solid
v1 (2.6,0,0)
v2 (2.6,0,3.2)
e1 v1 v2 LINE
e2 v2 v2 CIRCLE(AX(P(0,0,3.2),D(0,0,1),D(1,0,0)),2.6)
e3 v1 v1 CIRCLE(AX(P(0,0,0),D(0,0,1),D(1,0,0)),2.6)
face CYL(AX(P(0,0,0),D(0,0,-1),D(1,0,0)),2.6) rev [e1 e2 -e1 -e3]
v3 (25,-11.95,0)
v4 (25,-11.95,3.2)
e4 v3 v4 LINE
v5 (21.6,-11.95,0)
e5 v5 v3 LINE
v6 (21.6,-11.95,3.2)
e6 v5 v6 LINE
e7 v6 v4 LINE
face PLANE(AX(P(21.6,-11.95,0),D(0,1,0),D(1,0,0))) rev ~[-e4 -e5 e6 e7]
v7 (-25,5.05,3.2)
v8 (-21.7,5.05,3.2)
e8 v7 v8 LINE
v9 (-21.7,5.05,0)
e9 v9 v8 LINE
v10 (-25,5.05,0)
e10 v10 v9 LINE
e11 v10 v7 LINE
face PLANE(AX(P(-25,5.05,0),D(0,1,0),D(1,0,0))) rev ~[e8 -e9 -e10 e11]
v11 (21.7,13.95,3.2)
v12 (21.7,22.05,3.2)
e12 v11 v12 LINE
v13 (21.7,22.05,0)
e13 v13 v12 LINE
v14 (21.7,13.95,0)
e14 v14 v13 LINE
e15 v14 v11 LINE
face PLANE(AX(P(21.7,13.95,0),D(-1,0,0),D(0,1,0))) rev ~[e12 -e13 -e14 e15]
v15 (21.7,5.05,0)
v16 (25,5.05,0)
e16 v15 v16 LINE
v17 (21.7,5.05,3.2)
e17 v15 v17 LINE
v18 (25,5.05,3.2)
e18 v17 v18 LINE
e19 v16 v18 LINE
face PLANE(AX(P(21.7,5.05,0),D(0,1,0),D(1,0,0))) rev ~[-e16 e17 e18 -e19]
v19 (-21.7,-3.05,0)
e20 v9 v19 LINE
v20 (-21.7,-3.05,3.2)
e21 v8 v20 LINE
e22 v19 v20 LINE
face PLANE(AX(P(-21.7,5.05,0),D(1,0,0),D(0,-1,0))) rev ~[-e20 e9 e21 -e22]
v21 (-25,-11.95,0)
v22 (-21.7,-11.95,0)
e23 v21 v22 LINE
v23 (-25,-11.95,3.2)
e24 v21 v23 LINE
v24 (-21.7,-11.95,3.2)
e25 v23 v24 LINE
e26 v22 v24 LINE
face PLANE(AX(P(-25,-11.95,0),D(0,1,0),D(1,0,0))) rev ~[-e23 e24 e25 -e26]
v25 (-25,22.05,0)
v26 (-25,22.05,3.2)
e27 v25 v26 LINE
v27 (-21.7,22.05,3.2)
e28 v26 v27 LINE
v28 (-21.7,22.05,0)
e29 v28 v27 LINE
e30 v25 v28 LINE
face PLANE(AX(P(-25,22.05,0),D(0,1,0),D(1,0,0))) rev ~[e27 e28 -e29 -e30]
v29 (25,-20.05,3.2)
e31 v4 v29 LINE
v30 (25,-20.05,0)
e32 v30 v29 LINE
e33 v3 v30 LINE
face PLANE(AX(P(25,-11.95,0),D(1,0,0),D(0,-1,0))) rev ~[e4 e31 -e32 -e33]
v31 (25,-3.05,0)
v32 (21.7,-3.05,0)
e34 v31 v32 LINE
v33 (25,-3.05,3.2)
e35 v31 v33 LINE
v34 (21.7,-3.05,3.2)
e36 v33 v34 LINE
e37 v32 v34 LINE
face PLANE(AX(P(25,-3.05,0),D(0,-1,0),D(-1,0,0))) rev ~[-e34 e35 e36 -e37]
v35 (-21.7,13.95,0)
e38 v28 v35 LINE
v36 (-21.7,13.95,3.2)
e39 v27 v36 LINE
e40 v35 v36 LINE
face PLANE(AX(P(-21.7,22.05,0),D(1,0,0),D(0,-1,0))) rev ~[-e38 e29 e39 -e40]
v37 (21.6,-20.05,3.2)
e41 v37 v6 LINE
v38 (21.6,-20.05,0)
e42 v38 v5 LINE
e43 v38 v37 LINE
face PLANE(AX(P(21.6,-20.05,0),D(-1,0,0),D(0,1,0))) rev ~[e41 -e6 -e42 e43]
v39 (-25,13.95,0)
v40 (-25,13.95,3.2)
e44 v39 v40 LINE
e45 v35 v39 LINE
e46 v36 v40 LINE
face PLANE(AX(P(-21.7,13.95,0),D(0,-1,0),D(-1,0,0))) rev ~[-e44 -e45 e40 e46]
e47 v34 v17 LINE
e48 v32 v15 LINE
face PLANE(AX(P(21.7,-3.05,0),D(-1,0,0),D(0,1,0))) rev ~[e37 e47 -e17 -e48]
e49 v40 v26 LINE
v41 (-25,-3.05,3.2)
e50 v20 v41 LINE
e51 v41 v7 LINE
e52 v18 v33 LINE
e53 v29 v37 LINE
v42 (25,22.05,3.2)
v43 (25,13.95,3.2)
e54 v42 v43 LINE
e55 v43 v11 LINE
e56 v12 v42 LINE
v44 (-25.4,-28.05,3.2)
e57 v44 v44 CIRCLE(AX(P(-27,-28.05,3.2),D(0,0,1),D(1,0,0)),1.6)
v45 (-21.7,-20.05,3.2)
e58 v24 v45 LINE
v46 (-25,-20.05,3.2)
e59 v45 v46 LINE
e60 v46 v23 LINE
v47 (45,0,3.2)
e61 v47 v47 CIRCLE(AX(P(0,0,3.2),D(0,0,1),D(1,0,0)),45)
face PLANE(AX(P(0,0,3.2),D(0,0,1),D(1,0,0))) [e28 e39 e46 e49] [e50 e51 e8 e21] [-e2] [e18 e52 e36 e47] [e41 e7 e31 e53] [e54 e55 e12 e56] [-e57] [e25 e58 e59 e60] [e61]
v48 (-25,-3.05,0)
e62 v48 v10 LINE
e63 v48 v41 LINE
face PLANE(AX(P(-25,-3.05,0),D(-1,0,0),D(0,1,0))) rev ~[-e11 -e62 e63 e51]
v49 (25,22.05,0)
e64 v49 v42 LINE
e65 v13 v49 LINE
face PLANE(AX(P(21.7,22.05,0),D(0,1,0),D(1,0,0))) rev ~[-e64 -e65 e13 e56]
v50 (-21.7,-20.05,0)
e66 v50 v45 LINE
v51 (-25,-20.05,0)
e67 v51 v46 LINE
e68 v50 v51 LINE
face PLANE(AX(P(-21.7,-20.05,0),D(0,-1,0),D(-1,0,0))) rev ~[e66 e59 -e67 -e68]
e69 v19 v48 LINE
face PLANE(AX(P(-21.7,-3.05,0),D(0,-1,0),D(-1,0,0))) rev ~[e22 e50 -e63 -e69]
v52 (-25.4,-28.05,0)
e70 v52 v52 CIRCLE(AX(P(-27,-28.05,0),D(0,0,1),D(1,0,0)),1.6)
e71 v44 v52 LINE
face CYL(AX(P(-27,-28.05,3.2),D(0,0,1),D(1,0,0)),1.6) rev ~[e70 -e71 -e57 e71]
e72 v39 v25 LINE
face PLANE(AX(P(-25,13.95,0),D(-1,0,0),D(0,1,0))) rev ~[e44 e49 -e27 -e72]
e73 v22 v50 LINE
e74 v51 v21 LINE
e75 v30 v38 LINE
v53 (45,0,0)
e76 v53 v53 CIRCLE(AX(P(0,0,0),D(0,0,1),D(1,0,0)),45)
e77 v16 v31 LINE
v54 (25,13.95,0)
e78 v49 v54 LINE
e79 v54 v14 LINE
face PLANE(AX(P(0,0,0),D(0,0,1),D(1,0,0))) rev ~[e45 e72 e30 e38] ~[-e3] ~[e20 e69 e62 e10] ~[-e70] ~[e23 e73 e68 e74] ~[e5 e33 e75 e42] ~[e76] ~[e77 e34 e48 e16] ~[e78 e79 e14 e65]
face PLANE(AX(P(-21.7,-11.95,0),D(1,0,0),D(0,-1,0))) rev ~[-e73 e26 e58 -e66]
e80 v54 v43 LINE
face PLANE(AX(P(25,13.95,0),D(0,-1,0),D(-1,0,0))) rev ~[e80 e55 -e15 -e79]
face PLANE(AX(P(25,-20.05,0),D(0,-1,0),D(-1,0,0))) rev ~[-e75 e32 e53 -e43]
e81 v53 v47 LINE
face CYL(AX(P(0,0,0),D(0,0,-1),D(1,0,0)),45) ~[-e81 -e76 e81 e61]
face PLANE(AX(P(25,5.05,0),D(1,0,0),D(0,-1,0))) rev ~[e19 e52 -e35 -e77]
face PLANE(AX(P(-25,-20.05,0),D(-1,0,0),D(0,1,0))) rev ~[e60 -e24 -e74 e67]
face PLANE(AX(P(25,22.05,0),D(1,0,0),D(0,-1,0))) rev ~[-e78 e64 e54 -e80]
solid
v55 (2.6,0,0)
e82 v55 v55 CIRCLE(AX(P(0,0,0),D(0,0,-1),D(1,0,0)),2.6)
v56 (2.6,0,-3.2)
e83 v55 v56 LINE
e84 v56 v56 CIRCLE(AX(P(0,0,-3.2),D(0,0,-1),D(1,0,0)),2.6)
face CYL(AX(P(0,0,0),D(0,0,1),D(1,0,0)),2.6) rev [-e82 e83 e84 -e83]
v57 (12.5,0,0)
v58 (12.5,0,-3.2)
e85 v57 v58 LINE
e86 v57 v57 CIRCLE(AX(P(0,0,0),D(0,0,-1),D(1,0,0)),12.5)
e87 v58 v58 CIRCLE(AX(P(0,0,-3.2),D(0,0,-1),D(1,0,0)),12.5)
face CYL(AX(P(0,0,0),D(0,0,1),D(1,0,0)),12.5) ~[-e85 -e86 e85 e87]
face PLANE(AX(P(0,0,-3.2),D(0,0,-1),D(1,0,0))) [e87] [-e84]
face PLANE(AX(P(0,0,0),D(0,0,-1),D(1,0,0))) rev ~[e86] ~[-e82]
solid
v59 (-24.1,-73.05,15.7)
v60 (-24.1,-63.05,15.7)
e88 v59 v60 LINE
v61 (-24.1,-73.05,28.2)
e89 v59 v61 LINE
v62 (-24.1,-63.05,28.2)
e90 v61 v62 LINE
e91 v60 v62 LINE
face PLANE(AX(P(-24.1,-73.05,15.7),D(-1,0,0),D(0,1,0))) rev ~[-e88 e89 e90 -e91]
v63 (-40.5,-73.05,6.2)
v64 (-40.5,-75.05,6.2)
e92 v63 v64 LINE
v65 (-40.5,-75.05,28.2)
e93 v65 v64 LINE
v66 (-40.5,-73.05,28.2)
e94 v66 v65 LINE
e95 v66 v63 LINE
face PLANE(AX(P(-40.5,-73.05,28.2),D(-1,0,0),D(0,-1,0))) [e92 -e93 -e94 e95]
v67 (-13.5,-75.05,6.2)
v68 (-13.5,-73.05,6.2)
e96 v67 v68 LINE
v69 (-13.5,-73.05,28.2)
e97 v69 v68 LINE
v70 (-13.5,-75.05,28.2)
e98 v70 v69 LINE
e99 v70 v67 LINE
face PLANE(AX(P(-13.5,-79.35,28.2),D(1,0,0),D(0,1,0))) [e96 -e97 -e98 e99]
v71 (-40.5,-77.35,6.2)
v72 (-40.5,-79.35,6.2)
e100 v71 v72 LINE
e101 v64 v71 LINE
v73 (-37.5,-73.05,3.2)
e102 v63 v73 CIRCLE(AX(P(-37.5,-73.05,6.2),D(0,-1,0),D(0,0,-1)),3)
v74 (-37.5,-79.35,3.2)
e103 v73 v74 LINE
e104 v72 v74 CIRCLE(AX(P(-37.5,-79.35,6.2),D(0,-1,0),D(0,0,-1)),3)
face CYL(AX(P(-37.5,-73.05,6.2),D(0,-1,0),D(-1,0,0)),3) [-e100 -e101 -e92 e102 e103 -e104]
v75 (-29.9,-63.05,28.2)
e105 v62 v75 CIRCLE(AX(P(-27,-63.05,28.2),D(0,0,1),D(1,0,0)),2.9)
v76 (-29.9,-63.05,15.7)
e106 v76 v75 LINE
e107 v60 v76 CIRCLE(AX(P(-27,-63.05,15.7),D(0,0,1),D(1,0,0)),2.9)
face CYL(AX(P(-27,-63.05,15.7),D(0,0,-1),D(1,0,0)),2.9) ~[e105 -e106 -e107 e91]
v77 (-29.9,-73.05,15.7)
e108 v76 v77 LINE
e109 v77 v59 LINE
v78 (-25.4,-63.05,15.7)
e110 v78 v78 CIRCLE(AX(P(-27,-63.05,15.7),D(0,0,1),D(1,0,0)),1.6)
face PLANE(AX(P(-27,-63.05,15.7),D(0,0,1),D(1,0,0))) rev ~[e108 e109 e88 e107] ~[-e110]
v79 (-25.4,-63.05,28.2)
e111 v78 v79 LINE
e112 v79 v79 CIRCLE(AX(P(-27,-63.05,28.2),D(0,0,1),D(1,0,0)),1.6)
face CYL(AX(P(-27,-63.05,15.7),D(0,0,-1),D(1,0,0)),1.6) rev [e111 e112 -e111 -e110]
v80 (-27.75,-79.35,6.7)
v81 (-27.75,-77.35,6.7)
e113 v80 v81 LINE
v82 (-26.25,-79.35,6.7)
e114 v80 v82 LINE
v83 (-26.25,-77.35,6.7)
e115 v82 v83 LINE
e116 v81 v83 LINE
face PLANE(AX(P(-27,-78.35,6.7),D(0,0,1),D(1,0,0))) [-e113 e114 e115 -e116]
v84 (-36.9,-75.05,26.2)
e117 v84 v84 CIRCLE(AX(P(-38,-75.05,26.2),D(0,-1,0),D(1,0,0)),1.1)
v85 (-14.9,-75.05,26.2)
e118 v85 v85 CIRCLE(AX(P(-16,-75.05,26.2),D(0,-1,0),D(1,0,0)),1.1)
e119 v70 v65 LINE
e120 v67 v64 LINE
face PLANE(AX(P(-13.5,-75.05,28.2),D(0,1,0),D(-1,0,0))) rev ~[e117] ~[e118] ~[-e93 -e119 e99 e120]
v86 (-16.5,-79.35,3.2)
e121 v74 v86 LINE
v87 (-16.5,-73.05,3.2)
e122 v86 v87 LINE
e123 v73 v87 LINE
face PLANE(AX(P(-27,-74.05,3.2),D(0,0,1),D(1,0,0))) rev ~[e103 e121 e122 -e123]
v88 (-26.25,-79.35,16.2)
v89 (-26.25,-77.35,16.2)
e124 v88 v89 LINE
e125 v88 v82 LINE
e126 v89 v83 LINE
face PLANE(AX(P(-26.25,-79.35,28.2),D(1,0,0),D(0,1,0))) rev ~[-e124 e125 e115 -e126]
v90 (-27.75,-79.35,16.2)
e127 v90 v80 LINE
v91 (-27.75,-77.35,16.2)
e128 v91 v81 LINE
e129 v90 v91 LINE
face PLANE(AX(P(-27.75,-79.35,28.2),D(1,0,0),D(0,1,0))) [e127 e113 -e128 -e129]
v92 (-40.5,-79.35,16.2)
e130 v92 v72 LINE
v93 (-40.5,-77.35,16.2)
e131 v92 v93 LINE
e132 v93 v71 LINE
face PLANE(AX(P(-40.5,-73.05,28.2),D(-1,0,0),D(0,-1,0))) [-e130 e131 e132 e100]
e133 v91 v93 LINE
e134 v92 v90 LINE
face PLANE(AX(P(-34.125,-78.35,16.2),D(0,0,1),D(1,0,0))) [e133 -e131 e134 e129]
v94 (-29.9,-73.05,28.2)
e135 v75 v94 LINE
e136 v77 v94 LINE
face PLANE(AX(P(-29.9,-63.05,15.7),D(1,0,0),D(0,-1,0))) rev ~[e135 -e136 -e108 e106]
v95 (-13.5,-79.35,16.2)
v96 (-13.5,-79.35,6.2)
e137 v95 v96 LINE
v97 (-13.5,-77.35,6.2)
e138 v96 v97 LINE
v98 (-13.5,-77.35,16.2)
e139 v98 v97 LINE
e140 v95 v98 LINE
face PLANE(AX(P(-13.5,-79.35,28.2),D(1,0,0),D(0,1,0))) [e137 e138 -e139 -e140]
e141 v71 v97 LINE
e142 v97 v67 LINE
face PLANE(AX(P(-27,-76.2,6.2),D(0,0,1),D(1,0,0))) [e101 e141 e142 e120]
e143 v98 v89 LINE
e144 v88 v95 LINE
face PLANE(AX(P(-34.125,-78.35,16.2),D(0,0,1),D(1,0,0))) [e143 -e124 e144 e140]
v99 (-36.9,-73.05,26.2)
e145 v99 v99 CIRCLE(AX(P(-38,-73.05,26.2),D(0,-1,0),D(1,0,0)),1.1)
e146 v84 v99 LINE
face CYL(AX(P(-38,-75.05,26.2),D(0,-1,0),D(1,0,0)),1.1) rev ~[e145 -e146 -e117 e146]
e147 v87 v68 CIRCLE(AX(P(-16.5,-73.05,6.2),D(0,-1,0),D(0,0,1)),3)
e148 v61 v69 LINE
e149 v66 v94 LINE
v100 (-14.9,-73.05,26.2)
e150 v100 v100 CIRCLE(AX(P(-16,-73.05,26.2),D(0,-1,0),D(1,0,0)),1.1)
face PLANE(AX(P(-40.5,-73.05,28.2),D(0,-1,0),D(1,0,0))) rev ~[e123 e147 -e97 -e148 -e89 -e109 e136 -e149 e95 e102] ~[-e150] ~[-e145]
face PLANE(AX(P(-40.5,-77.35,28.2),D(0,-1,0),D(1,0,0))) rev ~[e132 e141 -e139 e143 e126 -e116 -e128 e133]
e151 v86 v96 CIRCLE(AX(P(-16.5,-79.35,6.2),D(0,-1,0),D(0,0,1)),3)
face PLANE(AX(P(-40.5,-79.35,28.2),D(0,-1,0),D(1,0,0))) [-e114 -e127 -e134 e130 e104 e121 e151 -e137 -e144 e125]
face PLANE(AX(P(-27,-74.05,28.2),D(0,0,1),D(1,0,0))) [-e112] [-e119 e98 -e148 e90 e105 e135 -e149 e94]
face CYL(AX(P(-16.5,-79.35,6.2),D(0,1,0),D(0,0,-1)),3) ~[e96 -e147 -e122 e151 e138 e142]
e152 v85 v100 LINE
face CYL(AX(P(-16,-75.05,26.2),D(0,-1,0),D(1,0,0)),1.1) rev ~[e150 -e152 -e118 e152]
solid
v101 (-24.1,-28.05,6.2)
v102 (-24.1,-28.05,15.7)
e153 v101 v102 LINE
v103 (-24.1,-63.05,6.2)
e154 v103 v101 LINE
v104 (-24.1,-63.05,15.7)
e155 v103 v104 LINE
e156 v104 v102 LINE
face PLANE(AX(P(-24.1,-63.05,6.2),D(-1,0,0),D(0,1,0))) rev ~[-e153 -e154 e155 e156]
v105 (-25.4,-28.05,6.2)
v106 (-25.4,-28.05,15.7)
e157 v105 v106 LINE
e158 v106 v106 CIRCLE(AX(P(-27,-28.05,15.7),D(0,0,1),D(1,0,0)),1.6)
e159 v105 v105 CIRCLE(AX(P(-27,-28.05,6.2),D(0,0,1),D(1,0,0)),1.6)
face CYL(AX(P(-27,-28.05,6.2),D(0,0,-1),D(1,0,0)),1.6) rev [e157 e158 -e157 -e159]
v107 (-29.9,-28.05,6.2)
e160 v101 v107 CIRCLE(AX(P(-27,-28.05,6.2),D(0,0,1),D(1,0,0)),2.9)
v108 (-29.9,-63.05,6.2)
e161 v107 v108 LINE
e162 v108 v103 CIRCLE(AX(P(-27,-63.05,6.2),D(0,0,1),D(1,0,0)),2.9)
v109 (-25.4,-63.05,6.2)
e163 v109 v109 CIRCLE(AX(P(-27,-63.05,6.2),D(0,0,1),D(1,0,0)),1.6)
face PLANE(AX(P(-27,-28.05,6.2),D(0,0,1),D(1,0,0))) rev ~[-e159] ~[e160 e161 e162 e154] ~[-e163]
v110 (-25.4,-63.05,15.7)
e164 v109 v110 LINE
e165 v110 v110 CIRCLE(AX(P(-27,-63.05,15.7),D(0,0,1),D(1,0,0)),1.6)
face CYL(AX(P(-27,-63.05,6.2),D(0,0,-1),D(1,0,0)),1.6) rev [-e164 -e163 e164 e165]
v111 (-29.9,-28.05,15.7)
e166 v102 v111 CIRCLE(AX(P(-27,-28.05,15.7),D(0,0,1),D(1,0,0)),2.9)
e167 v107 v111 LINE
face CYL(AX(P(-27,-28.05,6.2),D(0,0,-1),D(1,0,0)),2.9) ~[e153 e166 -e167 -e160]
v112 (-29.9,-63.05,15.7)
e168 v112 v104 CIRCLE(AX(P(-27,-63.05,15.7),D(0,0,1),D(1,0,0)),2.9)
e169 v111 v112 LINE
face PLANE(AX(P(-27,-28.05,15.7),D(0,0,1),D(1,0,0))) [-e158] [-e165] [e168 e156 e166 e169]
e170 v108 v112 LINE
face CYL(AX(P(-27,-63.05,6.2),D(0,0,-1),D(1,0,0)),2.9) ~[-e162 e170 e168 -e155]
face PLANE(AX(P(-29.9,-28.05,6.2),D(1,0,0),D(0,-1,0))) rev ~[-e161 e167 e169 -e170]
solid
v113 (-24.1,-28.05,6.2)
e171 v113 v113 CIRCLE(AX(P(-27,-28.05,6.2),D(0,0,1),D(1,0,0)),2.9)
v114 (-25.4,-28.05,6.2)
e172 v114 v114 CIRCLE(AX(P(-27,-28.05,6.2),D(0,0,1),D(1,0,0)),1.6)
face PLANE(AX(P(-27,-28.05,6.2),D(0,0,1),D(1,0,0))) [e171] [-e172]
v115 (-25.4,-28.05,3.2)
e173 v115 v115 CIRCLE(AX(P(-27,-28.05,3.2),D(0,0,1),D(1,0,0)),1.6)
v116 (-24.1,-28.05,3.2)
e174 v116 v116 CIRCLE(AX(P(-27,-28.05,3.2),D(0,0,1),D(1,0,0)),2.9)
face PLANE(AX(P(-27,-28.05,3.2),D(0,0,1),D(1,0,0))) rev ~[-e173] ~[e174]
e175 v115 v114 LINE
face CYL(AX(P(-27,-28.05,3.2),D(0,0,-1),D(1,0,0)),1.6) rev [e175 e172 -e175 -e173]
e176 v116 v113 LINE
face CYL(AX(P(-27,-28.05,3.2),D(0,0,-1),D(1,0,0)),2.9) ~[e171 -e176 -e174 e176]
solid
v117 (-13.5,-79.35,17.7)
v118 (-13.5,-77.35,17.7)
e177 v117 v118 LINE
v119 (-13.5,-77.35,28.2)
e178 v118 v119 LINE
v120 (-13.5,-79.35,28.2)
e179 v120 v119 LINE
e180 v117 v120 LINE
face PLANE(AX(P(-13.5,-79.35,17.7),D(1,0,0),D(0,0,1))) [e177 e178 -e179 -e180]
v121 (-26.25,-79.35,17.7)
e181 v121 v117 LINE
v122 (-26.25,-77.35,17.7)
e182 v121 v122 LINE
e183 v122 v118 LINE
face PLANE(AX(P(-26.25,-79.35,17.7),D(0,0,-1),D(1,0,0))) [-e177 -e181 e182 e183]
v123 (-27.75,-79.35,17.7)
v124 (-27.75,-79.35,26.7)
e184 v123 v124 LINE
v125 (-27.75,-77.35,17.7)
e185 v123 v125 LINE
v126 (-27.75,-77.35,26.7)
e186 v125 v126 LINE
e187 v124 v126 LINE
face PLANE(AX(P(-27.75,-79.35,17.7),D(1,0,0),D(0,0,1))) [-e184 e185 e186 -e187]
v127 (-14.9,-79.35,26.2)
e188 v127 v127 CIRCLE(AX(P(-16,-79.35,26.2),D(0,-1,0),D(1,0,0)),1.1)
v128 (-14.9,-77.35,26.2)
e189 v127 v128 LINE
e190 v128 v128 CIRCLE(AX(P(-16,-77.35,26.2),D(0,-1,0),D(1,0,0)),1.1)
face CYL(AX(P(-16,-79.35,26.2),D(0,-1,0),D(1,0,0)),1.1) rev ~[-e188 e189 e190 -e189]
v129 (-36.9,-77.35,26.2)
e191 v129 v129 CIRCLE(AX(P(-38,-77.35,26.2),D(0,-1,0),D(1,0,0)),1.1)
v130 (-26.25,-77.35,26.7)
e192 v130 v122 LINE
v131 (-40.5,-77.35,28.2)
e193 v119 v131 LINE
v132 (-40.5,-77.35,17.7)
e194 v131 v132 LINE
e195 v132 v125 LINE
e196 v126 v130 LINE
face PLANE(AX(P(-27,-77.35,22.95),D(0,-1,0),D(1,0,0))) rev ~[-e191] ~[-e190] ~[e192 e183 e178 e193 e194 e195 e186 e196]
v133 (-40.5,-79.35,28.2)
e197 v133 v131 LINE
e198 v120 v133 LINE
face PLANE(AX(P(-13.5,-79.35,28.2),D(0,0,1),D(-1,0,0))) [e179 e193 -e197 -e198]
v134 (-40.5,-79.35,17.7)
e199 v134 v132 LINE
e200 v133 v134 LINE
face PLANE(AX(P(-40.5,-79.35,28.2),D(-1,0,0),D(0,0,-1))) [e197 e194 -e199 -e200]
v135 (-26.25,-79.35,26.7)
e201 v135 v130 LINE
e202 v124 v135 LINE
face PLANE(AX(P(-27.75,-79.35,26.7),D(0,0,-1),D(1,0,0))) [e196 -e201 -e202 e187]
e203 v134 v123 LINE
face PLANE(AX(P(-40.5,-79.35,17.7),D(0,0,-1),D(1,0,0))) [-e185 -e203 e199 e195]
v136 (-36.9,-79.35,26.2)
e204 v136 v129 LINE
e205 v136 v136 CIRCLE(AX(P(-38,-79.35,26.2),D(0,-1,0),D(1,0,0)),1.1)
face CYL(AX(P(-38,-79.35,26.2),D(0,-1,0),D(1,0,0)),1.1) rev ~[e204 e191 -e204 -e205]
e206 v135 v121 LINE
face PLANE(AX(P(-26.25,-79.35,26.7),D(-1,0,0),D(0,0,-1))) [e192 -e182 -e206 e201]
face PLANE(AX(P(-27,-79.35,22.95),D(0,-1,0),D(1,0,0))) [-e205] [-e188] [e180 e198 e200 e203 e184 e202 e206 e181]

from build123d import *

# Parameters (mm, degrees)
F0_R      = 2.6
F1_DEPTH  = 3.2
F2_R      = 45
F2_R_2    = 35.3553390593
F3_DEPTH  = 3.2
F4_R      = 1.6
F5_DEPTH  = 3.2
F4_R_2    = 2.9
F6_DEPTH  = 2.5
F7_DEPTH  = 12
F9_DEPTH  = 3
F10_R     = 1.6
F11_DEPTH = 9.5
F12_R     = 12.5
F12_R_2   = 2.6
F13_DEPTH = 3.2
F14_R     = 1.6
F15_DEPTH = 12.5
F16_W     = 27
F16_H     = 2
F16_W_2   = 12.75
F16_W_3   = 1.5
F17_DEPTH = 25
F18_R     = 3
F19_DEPTH = 22
F20_DEPTH = 12
F21_DEPTH = 21.5
F22_R     = 1.1
F23_DEPTH = 2
F24_R     = 1.1
F25_DEPTH = 2


# Not quite as in the source:
# - a feature names something its author has since deleted; it is built from what else it names


with BuildPart() as f1:
    # F0 (on Top) → F1 (new body)
    with BuildSketch(Plane.XY):
        with BuildLine():
            ThreePointArc((25, -25), (32.6640741219, -13.5299025037), (35.3553390593, 0))
            ThreePointArc((35.3553390593, 0), (32.6640741219, 13.5299025037), (25, 25))
            Line((25, 25), (25, 22.05))
            Line((25, 22.05), (25, 13.95))
            Line((25, 13.95), (25, 5.05))
            Line((25, 5.05), (25, -3.05))
            Line((25, -3.05), (25, -11.95))
            Line((25, -11.95), (25, -20.05))
            Line((25, -20.05), (25, -25))
        make_face()
        with BuildLine():
            Line((-25, 25), (25, 25))
            ThreePointArc((25, 25), (0, 35.3553390593), (-25, 25))
        make_face()
        Polygon((25, 22.05), (25, 25), (-25, 25), (-25, 22.05), (-21.7, 22.05), (-21.7, 13.95), (-25, 13.95), (-25, 5.05), (-21.7, 5.05), (-21.7, -3.05), (-25, -3.05), (-25, -11.95), (-21.7, -11.95), (-21.7, -20.05), (-25, -20.05), (-25, -25), (25, -25), (25, -20.05), (21.6, -20.05), (21.6, -11.95), (25, -11.95), (25, -3.05), (21.7, -3.05), (21.7, 5.05), (25, 5.05), (25, 13.95), (21.7, 13.95), (21.7, 22.05), align=None)
        Circle(F0_R, mode=Mode.SUBTRACT)
        with BuildLine():
            ThreePointArc((-25, -25), (0, -35.3553390593), (25, -25))
            Line((25, -25), (-25, -25))
        make_face()
        with BuildLine():
            Line((-25, 22.05), (-25, 25))
            ThreePointArc((-25, 25), (-35.3553390593, 0), (-25, -25))
            Line((-25, -25), (-25, -20.05))
            Line((-25, -20.05), (-25, -11.95))
            Line((-25, -11.95), (-25, -3.05))
            Line((-25, -3.05), (-25, 5.05))
            Line((-25, 5.05), (-25, 13.95))
            Line((-25, 13.95), (-25, 22.05))
        make_face()
    extrude(amount=F1_DEPTH)

    # F2 (on Top) → F3 (join, through all)
    with BuildSketch(Plane.XY):
        Circle(F2_R)
        Circle(F2_R_2, mode=Mode.SUBTRACT)
    extrude(amount=F3_DEPTH)

    # F4 (on face) → F5 (cut, through all)
    with BuildSketch(Plane.XY.offset(3.2)):
        with Locations((-27, -28.05)):
            Circle(F4_R)
    extrude(amount=-F5_DEPTH, mode=Mode.SUBTRACT)


with BuildPart() as f6:
    # F4 (on face) → F6 (new body)
    with BuildSketch(Plane.XY.offset(3.2)):
        with Locations((-27, -28.05)):
            Circle(F4_R_2)
        with Locations((-27, -28.05)):
            Circle(F4_R, mode=Mode.SUBTRACT)
    extrude(amount=F6_DEPTH)


with BuildPart() as f7:
    # F4 (on face) → F7 (new body)
    with BuildSketch(Plane.XY.offset(3.2)):
        with Locations((-27, -28.05)):
            Circle(F4_R_2)
        with Locations((-27, -28.05)):
            Circle(F4_R, mode=Mode.SUBTRACT)
    extrude(amount=F7_DEPTH)


with BuildPart() as f9:
    # F4 (on face) → F9 (new body)
    with BuildSketch(Plane.XY.offset(3.2)):
        with Locations((-27, -28.05)):
            Circle(F4_R_2)
        with Locations((-27, -28.05)):
            Circle(F4_R, mode=Mode.SUBTRACT)
    extrude(amount=F9_DEPTH)


with BuildPart() as f11:
    # F10 (on face) → F11 (new body)
    with BuildSketch(Plane.XY.offset(6.2)):
        with BuildLine():
            ThreePointArc((-29.9, -28.05), (-27, -30.95), (-24.1, -28.05))
            ThreePointArc((-24.1, -28.05), (-27, -25.15), (-29.9, -28.05))
        make_face()
        with Locations((-27, -28.05)):
            Circle(F10_R, mode=Mode.SUBTRACT)
        with BuildLine():
            Line((-24.1, -63.05), (-24.1, -28.05))
            ThreePointArc((-24.1, -28.05), (-27, -30.95), (-29.9, -28.05))
            Line((-29.9, -28.05), (-29.9, -63.05))
            ThreePointArc((-29.9, -63.05), (-27, -60.15), (-24.1, -63.05))
        make_face()
        with BuildLine():
            ThreePointArc((-29.9, -63.05), (-27, -65.95), (-24.1, -63.05))
            ThreePointArc((-24.1, -63.05), (-27, -60.15), (-29.9, -63.05))
        make_face()
        with Locations((-27, -63.05)):
            Circle(F10_R, mode=Mode.SUBTRACT)
    extrude(amount=F11_DEPTH)


with BuildPart() as f13:
    # F12 (on face) → F13 (new body)
    with BuildSketch(Plane(origin=(0, 0, 0), x_dir=(1, 0, 0), z_dir=(0, 0, -1))):
        Circle(F12_R)
        Circle(F12_R_2, mode=Mode.SUBTRACT)
    extrude(amount=F13_DEPTH)


with BuildPart() as f15:
    # F14 (on face) → F15 (new body)
    with BuildSketch(Plane.XY.offset(15.7)):
        with BuildLine():
            ThreePointArc((-29.9, -63.05), (-27, -65.95), (-24.1, -63.05))
            ThreePointArc((-24.1, -63.05), (-27, -60.15), (-29.9, -63.05))
        make_face()
        with Locations((-27, -63.05)):
            Circle(F14_R, mode=Mode.SUBTRACT)
        with BuildLine():
            Line((-24.1, -73.05), (-24.1, -63.05))
            ThreePointArc((-24.1, -63.05), (-27, -65.95), (-29.9, -63.05))
            Line((-29.9, -63.05), (-29.9, -73.05))
            Line((-29.9, -73.05), (-24.1, -73.05))
        make_face()
    extrude(amount=F15_DEPTH)

    # F16 (on face) → F17 (join)
    with BuildSketch(Plane.XY.offset(28.2)):
        with Locations((-27, -74.05)):
            Rectangle(F16_W, F16_H)
        Polygon((-13.5, -75.05), (-40.5, -75.05), (-40.5, -77.35), (-27.75, -77.35), (-26.25, -77.35), (-13.5, -77.35), align=None)
        with Locations((-34.125, -78.35)):
            Rectangle(F16_W_2, F16_H)
        with Locations((-19.875, -78.35)):
            Rectangle(F16_W_2, F16_H)
        with Locations((-27, -78.35)):
            Rectangle(F16_W_3, F16_H)
    extrude(amount=-F17_DEPTH)

    # F18
    f18_edges = [f15.edges().sort_by_distance(p)[0] for p in [
        (-40.5, -76.2, 3.2),
        (-13.5, -76.2, 3.2),
    ]]
    fillet(f18_edges, radius=F18_R)

    # F16 (on face) → F19 (cut)
    with BuildSketch(Plane.XY.offset(28.2)):
        Polygon((-13.5, -75.05), (-40.5, -75.05), (-40.5, -77.35), (-27.75, -77.35), (-26.25, -77.35), (-13.5, -77.35), align=None)
    extrude(amount=-F19_DEPTH, mode=Mode.SUBTRACT)

    # F16 (on face) → F20 (cut)
    with BuildSketch(Plane.XY.offset(28.2)):
        with Locations((-34.125, -78.35)):
            Rectangle(F16_W_2, F16_H)
        with Locations((-27, -78.35)):
            Rectangle(F16_W_3, F16_H)
        with Locations((-19.875, -78.35)):
            Rectangle(F16_W_2, F16_H)
    extrude(amount=-F20_DEPTH, mode=Mode.SUBTRACT)

    # F16 (on face) → F21 (cut)
    with BuildSketch(Plane.XY.offset(28.2)):
        with Locations((-27, -78.35)):
            Rectangle(F16_W_3, F16_H)
    extrude(amount=-F21_DEPTH, mode=Mode.SUBTRACT)

    # F24 (on face) → F25 (cut, through all)
    with BuildSketch(Plane.XZ.offset(75.05)):
        with Locations((-38, 26.2)):
            Circle(F24_R)
        with Locations((-16, 26.2)):
            Circle(F24_R)
    extrude(amount=-F25_DEPTH, mode=Mode.SUBTRACT)


with BuildPart() as f23:
    # F22 (on face) → F23 (new body, through all)
    with BuildSketch(Plane.XZ.offset(79.35)):
        Polygon((-40.5, 17.7), (-27.75, 17.7), (-27.75, 26.7), (-26.25, 26.7), (-26.25, 17.7), (-13.5, 17.7), (-13.5, 28.2), (-40.5, 28.2), align=None)
        with Locations((-38, 26.2)):
            Circle(F22_R, mode=Mode.SUBTRACT)
        with Locations((-16, 26.2)):
            Circle(F22_R, mode=Mode.SUBTRACT)
    extrude(amount=-F23_DEPTH)


solid = Compound([f1.part, f9.part, f11.part, f13.part, f15.part, f23.part])
